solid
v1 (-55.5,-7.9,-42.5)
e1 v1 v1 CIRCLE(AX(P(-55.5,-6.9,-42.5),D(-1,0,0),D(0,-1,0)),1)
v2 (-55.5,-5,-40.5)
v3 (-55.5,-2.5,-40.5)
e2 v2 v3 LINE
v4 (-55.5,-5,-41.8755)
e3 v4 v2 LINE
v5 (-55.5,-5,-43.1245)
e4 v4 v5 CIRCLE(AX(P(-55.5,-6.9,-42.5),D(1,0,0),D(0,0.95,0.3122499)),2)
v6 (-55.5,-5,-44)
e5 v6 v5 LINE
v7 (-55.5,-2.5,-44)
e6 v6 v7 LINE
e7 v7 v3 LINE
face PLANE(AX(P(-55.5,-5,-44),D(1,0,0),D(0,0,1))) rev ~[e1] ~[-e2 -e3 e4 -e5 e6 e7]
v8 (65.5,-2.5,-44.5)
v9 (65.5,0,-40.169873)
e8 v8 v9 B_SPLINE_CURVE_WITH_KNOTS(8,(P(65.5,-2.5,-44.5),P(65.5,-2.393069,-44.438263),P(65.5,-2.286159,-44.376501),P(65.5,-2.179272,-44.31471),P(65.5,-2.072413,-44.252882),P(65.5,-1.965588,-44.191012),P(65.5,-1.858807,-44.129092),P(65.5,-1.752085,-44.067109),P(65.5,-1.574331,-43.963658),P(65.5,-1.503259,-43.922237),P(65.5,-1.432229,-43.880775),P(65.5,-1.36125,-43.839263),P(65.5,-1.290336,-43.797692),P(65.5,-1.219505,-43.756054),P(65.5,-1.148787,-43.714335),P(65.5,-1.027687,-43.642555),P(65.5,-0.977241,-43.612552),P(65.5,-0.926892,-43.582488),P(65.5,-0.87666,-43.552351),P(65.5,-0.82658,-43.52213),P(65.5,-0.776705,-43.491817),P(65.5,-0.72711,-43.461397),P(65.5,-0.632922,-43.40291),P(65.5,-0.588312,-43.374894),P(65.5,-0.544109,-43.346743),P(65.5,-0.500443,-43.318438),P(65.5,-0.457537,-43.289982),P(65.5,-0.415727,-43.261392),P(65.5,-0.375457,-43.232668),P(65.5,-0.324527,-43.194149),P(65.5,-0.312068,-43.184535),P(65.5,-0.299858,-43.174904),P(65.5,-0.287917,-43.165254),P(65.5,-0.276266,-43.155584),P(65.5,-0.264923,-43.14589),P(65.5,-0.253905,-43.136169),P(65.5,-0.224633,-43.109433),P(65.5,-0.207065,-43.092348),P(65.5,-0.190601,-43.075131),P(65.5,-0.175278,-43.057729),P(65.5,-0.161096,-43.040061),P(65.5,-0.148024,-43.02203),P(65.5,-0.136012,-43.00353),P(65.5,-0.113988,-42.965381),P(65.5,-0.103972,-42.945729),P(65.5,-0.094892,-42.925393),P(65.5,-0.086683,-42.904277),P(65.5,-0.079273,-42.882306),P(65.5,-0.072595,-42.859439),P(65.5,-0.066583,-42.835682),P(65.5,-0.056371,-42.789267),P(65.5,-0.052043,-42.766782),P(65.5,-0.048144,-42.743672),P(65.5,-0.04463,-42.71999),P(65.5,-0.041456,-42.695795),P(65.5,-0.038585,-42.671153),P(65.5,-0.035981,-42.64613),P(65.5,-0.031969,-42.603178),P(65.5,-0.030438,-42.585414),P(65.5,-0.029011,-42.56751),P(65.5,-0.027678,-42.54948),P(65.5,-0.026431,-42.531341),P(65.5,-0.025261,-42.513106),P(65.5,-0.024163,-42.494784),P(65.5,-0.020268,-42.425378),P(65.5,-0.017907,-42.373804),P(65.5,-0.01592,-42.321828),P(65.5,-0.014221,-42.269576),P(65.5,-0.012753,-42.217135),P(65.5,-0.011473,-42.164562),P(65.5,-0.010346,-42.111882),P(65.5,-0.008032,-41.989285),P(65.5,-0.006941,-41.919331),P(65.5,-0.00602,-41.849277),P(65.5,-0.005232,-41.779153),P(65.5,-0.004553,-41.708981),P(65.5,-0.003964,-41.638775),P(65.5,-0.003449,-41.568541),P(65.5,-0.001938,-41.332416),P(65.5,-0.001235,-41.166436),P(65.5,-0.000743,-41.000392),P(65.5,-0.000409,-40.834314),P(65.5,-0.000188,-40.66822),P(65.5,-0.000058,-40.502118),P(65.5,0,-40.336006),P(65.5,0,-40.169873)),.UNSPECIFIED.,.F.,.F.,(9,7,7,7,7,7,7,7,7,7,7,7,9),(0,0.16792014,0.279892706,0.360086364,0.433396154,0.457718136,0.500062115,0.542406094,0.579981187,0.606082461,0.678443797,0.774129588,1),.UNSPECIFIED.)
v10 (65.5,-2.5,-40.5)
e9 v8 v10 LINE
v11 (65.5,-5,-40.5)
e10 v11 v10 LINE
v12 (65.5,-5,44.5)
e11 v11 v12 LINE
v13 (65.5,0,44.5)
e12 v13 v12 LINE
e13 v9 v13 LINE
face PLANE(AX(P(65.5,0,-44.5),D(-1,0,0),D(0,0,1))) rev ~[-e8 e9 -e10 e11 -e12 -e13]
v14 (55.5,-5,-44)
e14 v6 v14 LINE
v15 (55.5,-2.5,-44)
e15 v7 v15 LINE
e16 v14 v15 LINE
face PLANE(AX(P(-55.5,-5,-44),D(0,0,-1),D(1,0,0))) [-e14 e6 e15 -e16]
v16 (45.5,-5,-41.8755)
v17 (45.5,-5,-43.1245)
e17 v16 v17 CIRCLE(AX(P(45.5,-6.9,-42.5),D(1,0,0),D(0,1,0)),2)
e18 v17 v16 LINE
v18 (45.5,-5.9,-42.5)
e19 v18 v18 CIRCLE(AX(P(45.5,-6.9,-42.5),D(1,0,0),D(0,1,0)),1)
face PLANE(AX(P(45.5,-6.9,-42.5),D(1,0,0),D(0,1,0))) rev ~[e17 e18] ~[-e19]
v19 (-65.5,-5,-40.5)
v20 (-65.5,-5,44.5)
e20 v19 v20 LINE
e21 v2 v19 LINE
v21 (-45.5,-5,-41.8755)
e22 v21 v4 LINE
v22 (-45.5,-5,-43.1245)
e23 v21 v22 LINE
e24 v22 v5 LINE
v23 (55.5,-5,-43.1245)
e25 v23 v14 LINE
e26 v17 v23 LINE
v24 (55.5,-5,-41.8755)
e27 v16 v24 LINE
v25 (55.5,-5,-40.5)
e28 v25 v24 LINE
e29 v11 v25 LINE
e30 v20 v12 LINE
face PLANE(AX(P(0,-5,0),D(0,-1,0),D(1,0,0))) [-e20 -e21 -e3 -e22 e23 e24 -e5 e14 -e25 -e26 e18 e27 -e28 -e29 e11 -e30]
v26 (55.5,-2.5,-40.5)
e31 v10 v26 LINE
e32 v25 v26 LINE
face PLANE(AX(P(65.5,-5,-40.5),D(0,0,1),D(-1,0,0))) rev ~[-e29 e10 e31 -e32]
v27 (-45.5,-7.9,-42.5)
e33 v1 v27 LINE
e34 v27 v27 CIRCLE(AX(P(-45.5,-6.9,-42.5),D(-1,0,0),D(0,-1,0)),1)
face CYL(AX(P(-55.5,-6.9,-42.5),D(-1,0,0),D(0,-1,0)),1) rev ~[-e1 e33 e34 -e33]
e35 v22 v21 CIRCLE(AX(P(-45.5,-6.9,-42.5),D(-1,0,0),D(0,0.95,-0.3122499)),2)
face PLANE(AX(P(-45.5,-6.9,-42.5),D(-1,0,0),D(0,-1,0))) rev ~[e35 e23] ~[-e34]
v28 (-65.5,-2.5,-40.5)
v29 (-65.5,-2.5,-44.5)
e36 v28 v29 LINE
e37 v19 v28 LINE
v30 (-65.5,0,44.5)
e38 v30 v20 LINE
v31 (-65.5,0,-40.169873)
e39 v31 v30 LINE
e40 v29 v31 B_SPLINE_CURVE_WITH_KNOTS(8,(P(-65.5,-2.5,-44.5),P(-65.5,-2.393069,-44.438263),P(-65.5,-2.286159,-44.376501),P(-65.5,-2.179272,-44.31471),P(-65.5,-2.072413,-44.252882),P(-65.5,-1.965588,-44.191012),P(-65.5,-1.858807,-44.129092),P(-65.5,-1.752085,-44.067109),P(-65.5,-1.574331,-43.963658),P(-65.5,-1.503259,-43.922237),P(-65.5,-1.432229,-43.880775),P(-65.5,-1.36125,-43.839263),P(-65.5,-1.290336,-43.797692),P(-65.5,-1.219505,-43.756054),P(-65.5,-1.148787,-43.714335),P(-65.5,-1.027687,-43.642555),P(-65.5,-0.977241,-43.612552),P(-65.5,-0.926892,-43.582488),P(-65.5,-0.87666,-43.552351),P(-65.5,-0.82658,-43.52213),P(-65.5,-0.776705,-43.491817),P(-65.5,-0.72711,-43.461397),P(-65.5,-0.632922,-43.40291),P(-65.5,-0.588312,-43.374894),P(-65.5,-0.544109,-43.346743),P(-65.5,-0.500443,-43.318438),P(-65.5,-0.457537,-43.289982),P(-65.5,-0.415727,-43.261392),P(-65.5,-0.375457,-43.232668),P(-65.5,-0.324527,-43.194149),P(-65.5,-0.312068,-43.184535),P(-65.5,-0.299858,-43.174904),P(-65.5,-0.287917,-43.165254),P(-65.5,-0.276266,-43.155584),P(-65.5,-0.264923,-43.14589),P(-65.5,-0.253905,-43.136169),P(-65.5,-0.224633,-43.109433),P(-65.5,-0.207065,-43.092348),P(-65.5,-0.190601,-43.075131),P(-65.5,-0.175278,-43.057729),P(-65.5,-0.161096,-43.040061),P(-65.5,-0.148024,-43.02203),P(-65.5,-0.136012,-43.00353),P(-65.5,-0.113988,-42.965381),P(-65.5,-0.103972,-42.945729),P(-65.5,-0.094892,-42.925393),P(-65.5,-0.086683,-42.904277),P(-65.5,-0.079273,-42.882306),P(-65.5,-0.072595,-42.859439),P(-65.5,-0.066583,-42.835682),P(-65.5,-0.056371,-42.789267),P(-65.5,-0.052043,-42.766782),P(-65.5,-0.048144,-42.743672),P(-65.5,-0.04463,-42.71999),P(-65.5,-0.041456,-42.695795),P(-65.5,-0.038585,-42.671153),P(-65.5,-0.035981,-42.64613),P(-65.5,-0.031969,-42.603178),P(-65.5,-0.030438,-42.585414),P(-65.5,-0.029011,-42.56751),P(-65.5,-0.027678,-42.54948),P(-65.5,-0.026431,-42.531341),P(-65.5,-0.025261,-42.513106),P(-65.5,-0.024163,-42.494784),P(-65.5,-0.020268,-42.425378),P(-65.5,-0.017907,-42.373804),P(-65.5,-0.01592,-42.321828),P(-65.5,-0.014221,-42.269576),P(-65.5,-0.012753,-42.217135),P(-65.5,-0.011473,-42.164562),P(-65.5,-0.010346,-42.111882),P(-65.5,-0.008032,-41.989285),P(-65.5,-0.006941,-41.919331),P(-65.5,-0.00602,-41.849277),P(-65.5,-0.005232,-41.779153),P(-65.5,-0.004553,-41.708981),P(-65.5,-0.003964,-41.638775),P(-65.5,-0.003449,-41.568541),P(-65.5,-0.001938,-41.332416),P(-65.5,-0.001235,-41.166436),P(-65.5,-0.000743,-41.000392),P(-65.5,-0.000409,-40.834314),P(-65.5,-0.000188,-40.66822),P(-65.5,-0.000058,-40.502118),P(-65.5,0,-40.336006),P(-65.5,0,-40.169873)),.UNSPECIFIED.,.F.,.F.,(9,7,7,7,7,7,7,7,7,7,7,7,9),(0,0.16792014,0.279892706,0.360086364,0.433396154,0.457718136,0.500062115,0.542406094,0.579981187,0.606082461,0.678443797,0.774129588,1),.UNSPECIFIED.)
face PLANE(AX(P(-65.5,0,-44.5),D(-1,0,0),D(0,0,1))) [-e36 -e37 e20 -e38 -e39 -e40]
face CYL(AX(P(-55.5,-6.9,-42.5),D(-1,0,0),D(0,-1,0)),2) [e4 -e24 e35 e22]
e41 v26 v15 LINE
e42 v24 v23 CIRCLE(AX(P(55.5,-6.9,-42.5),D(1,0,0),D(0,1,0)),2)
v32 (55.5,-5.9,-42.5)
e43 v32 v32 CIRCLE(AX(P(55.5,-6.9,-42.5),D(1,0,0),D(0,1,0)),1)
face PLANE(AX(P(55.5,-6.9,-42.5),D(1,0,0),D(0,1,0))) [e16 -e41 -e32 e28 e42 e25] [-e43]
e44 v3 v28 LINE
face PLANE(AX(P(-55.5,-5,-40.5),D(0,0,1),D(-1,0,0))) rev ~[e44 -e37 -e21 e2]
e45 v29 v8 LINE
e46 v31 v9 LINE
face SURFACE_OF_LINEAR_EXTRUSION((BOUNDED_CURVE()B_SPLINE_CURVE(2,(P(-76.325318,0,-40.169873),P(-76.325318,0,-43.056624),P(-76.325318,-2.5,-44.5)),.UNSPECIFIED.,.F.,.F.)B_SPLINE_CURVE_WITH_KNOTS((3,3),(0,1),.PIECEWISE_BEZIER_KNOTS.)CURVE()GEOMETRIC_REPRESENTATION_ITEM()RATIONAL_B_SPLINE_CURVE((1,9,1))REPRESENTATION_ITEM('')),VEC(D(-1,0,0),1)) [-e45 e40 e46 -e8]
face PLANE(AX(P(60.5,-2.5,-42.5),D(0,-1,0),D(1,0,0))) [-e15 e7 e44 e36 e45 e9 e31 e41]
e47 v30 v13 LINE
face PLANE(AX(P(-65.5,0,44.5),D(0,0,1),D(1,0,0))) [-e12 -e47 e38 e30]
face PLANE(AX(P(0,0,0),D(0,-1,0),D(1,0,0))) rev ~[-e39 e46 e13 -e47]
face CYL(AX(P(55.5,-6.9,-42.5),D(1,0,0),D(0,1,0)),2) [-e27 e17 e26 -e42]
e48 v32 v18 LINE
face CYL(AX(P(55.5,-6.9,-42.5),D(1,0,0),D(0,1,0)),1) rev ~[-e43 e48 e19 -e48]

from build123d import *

# Parameters (mm, degrees)
F0_W        = 131
F0_H        = 89
F1_DEPTH    = 5
F3_START    = -10
F2_R        = 2
F2_R_2      = 1
F3_DEPTH    = 10
F5_START    = -10
F4_R        = 2
F4_R_2      = 1
F5_DEPTH    = 10
F6_W        = 111
F6_H        = 0.5
F7_DEPTH    = 2.5
F8_T1_DEPTH = 152.6506350946


# Not quite as in the source:
# - a fillet or chamfer that OpenCascade refuses, or shapes differently, is made with other operations: its cross-section is extruded or revolved along the edge and cut away or added


with BuildPart() as f1:
    # F0 (on Front) → F1 (new body)
    with BuildSketch(Plane.XZ):
        Rectangle(F0_W, F0_H)
    extrude(amount=F1_DEPTH)

    # F2 (on face) → F3 (join)
    with BuildSketch(Plane(origin=(-65.5, 0, 0), x_dir=(0, -1, 0), z_dir=(-1, 0, 0)).offset(F3_START)):
        with Locations((6.9, -42.5)):
            Circle(F2_R)
        with Locations((6.9, -42.5)):
            Circle(F2_R_2, mode=Mode.SUBTRACT)
    extrude(amount=-F3_DEPTH)

    # F4 (on face) → F5 (join)
    with BuildSketch(Plane.YZ.offset(65.5).offset(F5_START)):
        with Locations((-6.9, -42.5)):
            Circle(F4_R)
        with Locations((-6.9, -42.5)):
            Circle(F4_R_2, mode=Mode.SUBTRACT)
    extrude(amount=-F5_DEPTH)

    # F6 (on face) → F7 (cut)
    with BuildSketch(Plane.XZ.offset(5)):
        Polygon((55.5, -44.5), (65.5, -44.5), (65.5, -40.5), (55.5, -40.5), (55.5, -44), align=None)
        with Locations((0, -44.25)):
            Rectangle(F6_W, F6_H)
        Polygon((-65.5, -44.5), (-55.5, -44.5), (-55.5, -44), (-55.5, -40.5), (-65.5, -40.5), align=None)
    extrude(amount=-F7_DEPTH, mode=Mode.SUBTRACT)

    # F8: fillet of radius 5 on 1 edges, made by hand

    # F8_s2 → F8_t1 (cut)
    with BuildSketch(Plane.YZ.offset(-76.3253175473)):
        with BuildLine():
            add(Edge.make_bspline(
                [(0, -40.1698729811), (0, -43.056624327), (-2.5, -44.5)],
                knots=[0, 0, 0, 1, 1, 1], degree=2, weights=[1, 9, 1]))
            Line((-2.5, -44.5), (0, -44.5))
            Line((0, -44.5), (0, -40.1698729811))
        make_face()
    extrude(amount=F8_T1_DEPTH, mode=Mode.SUBTRACT)


solid = f1.part
